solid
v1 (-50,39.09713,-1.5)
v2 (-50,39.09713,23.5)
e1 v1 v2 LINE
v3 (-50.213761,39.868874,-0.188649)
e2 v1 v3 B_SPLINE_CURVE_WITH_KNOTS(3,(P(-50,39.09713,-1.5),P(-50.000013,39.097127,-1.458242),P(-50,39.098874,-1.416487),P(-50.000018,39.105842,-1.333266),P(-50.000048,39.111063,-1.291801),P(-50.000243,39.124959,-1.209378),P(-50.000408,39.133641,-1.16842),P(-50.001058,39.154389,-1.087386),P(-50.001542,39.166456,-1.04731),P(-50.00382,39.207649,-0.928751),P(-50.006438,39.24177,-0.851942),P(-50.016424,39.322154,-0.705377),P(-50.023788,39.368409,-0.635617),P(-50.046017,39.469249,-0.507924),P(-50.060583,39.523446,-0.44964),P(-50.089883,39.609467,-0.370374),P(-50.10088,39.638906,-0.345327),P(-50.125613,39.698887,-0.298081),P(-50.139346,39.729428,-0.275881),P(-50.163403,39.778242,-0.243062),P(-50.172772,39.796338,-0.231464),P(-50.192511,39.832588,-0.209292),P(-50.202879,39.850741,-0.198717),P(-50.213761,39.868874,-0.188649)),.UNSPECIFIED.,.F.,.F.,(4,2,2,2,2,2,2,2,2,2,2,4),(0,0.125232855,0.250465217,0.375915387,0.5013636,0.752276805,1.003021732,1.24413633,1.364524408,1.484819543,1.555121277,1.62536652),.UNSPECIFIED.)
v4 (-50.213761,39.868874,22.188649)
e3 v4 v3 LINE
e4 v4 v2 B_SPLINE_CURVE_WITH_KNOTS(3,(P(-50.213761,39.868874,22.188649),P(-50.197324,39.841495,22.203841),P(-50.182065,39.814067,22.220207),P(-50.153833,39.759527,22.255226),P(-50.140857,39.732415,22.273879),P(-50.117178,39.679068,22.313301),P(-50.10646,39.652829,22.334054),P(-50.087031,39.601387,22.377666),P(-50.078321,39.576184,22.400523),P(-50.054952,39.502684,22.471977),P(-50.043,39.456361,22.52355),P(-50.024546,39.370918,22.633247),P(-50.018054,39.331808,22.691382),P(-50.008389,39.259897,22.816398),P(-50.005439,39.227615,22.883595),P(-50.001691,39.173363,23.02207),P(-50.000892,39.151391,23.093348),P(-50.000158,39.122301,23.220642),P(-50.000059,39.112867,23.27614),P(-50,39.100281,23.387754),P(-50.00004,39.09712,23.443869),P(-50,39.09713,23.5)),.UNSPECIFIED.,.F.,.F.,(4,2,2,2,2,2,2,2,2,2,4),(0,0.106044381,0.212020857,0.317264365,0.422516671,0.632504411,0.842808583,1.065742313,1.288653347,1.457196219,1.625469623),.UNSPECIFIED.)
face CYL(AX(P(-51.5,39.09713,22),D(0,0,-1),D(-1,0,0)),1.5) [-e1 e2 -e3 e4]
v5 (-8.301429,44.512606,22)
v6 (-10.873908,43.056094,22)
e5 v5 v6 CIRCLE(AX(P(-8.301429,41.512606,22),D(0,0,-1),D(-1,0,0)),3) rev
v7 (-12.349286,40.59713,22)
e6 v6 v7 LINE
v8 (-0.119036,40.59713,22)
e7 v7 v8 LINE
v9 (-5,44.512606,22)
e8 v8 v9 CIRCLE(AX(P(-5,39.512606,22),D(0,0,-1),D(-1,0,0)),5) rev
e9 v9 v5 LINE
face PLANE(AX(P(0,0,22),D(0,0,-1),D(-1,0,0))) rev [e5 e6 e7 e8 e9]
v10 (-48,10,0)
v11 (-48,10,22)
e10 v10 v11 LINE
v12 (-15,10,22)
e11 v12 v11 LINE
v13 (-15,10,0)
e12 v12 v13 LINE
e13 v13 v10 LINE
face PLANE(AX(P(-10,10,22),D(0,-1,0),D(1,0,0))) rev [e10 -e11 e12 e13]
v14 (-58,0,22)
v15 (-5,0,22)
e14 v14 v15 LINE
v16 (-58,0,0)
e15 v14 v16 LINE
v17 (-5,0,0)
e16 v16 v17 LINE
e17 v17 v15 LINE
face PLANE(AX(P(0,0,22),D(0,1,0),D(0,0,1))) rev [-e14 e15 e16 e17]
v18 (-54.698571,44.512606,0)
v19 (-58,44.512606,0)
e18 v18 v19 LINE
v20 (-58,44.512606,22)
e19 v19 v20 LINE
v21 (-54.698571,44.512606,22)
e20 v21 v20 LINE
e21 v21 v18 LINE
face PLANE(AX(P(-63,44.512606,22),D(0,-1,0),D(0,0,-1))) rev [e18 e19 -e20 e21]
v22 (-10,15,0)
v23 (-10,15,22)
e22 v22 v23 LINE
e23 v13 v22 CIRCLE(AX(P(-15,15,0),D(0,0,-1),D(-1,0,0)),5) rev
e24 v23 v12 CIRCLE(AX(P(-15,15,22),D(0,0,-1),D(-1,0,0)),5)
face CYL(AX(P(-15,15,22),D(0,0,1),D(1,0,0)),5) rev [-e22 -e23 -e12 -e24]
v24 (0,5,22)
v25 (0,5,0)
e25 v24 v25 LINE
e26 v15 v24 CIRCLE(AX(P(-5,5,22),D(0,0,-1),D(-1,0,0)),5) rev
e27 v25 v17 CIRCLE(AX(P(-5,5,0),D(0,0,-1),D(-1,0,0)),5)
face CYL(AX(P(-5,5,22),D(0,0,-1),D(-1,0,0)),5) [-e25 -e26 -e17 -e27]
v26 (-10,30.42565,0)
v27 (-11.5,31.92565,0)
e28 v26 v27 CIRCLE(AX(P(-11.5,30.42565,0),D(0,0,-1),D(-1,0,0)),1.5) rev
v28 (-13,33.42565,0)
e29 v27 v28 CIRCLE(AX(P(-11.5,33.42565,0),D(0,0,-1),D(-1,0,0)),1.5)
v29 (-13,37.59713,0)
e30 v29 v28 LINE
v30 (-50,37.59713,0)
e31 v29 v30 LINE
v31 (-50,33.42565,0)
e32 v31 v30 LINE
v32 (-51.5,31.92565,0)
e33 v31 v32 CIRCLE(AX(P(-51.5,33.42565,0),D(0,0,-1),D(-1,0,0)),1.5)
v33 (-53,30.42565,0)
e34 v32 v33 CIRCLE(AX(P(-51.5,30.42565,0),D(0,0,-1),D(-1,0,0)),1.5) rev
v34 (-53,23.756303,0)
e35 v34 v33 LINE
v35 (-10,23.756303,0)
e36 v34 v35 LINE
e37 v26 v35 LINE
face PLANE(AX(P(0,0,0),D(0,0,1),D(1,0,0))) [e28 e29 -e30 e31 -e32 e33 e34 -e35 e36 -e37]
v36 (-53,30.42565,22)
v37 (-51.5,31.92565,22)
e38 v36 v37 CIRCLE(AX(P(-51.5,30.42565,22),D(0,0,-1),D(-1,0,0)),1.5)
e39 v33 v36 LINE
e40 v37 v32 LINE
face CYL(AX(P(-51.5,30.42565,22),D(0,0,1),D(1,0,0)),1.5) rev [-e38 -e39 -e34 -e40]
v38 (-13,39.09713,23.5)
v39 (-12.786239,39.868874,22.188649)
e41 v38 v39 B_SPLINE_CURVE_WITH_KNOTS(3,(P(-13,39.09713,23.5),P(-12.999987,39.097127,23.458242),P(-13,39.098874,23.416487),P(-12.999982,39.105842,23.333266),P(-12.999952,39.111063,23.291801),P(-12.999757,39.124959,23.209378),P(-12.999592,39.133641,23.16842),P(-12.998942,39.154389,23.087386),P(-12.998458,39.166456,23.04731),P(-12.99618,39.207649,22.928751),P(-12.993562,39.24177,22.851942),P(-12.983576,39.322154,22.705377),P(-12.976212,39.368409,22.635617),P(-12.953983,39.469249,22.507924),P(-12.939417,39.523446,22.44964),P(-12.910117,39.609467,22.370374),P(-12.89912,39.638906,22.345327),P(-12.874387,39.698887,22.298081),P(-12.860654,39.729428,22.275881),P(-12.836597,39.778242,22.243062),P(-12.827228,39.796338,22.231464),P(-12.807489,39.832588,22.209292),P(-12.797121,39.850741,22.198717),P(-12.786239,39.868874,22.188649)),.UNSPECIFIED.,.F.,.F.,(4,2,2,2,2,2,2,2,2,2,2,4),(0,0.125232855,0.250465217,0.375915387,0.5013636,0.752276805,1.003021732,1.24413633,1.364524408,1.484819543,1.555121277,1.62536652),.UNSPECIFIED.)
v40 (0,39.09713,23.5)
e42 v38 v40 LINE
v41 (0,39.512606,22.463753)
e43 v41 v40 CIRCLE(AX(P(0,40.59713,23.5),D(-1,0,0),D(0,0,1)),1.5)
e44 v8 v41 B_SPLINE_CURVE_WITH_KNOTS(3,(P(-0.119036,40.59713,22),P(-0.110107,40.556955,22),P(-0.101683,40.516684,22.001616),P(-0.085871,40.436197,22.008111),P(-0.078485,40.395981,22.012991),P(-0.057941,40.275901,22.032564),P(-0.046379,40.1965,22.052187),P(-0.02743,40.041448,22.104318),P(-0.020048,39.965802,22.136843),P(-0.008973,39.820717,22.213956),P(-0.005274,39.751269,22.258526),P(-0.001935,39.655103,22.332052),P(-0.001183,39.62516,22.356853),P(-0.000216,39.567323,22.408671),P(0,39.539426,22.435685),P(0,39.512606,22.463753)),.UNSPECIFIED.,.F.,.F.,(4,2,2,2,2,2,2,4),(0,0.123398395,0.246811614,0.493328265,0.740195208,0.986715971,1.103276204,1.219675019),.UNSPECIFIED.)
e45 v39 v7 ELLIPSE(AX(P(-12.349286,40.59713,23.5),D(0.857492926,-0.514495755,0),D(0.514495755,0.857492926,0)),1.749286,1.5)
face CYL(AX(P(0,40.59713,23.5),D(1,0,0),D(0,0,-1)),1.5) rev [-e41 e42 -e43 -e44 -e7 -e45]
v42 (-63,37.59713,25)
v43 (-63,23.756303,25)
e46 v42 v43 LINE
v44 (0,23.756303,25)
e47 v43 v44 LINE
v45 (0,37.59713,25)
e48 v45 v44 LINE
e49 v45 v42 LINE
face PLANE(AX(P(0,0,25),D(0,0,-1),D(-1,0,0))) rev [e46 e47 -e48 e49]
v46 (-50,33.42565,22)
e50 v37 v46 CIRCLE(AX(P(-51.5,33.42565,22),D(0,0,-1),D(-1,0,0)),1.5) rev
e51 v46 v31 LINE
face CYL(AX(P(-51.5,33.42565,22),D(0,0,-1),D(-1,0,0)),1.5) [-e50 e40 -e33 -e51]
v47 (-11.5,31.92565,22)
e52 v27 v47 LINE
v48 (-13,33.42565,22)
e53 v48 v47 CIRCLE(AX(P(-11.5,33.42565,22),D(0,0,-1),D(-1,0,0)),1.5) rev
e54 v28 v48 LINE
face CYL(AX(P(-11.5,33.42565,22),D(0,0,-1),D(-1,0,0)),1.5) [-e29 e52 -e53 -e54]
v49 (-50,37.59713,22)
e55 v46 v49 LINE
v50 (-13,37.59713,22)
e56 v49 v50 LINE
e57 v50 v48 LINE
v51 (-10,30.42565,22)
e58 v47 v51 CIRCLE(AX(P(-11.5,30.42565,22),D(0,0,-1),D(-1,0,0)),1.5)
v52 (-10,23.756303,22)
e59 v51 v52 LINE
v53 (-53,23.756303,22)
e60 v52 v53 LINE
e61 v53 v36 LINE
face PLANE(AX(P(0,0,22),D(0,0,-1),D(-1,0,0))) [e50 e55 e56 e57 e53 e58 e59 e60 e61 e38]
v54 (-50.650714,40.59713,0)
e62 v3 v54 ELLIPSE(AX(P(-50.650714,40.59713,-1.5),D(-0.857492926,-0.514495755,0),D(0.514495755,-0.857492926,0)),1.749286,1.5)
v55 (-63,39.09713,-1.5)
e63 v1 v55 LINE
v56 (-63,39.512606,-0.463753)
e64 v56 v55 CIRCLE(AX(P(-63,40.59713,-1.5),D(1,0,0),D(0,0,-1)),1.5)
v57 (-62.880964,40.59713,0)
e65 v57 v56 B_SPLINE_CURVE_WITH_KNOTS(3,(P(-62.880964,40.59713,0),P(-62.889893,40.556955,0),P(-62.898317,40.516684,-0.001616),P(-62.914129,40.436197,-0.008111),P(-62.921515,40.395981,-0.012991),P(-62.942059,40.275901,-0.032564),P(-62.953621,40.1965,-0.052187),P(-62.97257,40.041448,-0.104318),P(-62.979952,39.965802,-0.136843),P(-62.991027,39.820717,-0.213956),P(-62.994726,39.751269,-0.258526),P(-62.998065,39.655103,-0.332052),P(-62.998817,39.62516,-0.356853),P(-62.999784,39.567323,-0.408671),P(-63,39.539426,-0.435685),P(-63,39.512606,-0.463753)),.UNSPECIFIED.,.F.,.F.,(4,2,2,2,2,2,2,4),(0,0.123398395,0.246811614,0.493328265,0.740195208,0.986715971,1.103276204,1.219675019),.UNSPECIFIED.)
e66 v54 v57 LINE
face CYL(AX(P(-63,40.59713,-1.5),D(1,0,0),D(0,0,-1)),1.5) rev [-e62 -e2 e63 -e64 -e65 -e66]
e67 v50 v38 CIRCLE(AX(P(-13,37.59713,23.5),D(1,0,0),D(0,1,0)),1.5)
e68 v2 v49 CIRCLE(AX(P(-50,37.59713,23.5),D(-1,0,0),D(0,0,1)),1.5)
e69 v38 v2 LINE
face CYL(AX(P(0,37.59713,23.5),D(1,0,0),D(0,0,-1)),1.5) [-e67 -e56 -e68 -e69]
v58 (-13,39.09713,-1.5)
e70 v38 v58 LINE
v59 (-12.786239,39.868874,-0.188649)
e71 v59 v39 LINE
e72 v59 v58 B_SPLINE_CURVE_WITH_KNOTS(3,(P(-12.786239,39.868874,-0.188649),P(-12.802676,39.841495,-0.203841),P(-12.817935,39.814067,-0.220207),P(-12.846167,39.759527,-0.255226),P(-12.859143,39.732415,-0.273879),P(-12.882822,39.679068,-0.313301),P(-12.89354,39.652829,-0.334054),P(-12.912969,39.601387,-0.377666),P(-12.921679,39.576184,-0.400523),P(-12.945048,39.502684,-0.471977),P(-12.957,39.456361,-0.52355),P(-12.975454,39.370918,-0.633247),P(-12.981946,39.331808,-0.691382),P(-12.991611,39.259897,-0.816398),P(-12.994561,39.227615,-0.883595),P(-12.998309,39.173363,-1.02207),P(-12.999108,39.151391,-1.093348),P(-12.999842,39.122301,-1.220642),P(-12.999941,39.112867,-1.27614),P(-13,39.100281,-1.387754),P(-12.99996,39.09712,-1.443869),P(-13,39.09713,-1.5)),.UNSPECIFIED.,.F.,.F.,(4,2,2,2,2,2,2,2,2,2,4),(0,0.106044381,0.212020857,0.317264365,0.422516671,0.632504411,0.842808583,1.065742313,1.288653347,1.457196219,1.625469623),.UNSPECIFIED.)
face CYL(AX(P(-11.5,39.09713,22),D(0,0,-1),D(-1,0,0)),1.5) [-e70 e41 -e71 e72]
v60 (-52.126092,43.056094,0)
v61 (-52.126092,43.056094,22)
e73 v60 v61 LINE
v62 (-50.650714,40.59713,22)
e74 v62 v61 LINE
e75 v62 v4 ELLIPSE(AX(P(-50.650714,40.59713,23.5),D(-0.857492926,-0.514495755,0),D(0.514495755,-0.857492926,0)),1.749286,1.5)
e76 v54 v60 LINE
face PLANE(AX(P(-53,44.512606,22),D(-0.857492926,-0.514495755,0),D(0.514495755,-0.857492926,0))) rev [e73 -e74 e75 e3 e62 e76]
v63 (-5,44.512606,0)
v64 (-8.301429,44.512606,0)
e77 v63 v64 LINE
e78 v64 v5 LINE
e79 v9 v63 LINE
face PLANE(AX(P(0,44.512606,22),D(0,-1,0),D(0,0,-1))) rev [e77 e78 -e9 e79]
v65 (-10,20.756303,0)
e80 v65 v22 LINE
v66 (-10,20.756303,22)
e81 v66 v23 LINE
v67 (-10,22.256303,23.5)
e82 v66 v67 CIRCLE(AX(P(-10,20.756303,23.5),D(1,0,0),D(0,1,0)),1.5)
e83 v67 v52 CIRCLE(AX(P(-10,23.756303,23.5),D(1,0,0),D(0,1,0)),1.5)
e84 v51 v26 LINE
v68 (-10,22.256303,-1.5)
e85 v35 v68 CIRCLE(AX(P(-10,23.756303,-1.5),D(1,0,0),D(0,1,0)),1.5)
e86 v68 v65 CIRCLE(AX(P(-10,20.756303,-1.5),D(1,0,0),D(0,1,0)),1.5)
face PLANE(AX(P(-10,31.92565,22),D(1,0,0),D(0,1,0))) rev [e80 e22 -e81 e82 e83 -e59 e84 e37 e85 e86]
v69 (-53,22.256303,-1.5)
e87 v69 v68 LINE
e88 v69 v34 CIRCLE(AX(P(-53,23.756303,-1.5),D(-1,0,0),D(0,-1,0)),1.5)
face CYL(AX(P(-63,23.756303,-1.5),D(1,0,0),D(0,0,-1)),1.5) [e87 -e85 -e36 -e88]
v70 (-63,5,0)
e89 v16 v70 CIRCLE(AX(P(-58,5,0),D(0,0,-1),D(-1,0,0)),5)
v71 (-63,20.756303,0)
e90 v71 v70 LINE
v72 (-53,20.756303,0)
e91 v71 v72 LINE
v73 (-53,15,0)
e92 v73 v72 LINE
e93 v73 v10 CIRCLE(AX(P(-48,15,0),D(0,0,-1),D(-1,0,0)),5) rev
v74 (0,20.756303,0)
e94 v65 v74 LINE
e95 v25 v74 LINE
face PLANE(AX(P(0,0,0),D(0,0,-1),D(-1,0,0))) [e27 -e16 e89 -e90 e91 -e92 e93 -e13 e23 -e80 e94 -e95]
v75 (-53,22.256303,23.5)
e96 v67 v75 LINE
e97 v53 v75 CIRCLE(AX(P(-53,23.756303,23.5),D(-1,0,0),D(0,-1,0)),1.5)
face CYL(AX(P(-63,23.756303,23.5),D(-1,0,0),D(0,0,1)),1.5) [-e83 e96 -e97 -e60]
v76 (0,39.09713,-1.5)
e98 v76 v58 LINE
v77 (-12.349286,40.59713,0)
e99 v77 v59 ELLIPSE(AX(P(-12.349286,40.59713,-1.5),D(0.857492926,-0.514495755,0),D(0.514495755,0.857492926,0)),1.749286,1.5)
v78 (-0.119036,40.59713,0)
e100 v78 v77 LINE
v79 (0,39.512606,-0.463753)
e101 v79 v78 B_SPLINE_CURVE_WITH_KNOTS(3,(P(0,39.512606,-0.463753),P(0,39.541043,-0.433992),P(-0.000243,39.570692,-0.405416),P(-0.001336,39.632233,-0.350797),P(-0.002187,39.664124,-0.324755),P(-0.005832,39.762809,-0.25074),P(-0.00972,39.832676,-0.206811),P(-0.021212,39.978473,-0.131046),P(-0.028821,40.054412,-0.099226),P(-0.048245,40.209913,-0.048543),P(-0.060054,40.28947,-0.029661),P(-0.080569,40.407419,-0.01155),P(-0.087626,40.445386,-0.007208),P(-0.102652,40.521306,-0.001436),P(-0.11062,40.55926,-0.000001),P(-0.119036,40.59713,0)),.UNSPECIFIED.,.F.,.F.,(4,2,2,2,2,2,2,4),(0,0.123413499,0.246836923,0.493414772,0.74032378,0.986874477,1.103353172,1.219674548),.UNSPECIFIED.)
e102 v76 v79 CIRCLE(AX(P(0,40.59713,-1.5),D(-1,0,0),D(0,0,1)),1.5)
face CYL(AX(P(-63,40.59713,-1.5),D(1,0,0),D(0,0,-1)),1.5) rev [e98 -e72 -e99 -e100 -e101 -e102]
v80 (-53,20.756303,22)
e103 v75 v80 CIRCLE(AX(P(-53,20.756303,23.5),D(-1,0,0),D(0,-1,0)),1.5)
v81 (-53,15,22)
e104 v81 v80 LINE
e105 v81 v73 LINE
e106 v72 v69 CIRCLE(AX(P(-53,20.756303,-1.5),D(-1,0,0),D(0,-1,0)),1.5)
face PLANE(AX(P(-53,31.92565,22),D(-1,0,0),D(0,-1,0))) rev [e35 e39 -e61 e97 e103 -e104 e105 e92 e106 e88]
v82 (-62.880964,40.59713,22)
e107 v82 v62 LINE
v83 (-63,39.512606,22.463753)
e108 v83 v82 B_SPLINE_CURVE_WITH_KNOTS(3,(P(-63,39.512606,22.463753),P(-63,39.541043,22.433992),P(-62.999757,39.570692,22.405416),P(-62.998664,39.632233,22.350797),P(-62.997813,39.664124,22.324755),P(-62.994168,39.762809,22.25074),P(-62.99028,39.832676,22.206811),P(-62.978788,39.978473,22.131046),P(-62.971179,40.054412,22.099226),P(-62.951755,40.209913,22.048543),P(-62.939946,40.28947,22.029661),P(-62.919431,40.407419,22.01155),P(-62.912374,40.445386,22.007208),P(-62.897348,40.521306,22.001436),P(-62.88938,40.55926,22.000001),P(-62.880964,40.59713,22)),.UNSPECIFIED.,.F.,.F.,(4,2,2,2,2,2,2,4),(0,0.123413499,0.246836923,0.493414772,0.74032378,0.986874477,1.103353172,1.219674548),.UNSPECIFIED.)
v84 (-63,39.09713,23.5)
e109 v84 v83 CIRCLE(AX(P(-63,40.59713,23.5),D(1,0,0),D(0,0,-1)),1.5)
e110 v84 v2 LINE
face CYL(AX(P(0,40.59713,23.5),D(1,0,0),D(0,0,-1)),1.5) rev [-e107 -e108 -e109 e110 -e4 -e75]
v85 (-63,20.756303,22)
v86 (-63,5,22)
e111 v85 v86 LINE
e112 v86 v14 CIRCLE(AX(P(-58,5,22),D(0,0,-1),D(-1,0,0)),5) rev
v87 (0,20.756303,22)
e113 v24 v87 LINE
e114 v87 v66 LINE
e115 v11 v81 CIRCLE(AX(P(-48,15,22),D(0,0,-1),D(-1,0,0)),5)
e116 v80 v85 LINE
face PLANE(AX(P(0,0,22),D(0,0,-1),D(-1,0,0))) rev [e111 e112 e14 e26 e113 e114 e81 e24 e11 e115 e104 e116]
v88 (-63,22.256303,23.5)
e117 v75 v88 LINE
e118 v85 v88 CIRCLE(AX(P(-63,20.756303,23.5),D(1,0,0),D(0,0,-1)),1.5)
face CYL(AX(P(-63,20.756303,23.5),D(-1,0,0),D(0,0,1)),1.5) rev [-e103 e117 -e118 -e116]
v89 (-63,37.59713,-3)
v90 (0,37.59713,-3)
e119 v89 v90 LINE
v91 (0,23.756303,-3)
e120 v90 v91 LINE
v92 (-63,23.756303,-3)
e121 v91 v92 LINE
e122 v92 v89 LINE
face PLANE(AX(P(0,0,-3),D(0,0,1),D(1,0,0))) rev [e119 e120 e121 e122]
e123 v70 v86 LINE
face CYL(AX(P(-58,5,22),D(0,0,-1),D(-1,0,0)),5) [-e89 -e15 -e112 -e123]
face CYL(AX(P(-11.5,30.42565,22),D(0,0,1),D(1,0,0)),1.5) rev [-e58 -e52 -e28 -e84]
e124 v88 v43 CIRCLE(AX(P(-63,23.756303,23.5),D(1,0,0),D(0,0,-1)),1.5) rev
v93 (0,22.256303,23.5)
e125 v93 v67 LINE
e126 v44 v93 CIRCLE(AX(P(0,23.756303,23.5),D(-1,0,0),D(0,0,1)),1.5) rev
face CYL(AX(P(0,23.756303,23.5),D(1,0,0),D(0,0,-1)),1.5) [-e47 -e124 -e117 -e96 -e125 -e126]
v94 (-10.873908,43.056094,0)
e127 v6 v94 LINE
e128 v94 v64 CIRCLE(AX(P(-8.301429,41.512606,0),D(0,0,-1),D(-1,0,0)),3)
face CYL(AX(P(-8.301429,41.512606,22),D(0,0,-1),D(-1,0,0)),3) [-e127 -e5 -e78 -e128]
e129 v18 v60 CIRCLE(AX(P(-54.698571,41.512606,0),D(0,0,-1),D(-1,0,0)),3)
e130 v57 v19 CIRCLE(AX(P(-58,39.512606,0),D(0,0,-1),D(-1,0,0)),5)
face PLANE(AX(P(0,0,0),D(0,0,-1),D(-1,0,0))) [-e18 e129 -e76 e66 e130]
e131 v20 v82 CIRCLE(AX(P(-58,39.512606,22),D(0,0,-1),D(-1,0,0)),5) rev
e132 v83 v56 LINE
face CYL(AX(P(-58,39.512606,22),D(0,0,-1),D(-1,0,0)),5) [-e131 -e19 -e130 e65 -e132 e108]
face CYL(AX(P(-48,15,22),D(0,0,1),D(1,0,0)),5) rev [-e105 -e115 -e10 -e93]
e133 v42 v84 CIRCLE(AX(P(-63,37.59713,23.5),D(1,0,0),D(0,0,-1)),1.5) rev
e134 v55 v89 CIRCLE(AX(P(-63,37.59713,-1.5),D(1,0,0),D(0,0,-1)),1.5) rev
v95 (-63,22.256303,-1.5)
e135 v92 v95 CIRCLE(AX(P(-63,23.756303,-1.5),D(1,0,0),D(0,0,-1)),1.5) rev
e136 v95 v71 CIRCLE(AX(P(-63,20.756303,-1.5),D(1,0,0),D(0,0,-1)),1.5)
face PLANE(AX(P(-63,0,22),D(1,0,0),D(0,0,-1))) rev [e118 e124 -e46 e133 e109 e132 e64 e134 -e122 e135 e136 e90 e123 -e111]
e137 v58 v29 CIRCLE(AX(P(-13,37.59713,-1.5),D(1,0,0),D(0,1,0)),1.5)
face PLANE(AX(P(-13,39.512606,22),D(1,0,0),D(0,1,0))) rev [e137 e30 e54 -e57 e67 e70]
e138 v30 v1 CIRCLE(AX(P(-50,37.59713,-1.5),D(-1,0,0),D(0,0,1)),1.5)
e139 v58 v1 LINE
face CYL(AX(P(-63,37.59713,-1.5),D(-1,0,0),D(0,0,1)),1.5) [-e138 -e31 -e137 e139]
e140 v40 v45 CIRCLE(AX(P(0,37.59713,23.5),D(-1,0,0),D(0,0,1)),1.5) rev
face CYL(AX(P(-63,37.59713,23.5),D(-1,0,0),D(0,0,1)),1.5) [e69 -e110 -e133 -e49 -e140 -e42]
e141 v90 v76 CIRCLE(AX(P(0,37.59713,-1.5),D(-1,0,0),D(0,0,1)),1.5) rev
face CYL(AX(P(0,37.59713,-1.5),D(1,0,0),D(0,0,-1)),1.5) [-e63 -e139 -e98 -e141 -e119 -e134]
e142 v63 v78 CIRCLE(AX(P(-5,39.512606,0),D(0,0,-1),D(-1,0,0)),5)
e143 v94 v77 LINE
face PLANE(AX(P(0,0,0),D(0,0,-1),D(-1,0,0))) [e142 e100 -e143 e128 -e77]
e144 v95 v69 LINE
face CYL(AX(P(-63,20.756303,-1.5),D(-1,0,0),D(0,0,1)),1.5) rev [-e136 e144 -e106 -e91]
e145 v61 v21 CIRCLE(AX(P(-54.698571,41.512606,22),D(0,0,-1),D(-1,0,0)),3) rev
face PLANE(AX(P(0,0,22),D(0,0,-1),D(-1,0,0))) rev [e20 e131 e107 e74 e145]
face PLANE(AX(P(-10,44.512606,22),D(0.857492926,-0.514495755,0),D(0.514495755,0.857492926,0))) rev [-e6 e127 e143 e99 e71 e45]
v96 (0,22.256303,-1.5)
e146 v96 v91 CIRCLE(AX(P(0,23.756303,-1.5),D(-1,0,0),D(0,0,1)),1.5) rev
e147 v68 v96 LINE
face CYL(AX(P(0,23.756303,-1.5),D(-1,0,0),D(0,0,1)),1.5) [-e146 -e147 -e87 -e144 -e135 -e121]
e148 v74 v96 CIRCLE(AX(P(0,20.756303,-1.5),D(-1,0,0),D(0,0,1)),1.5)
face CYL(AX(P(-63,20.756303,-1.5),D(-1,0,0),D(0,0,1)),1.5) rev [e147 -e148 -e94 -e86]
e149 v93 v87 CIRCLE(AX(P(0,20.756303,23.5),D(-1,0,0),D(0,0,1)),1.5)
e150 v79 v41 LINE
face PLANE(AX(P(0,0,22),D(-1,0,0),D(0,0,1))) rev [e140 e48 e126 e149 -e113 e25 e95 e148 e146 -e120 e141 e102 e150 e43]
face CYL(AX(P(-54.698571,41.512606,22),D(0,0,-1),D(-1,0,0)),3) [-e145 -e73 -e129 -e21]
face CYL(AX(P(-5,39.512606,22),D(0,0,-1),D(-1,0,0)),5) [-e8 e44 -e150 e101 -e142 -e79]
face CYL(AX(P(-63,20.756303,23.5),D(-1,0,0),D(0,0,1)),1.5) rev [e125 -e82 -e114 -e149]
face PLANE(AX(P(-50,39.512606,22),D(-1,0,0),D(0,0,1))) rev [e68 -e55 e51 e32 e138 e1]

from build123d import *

# Parameters (mm, degrees)
BOSS_EXTRUDE1_DEPTH = 22
FILLET2_R           = 5
FILLET4_R           = 5
FILLET5_R           = 1.5
FILLET6_R           = 3
FILLET7_R           = 1.5
SKETCH5_W           = 63
SKETCH5_H           = 16.840827273
BOSS_EXTRUDE2_DEPTH = 3
SKETCH6_W           = 63
SKETCH6_H           = 16.840827273
BOSS_EXTRUDE3_DEPTH = 3
FILLET8_R           = 1.5
FILLET9_R           = 1.5


with BuildPart() as part:
    # Sketch1 → Boss-Extrude1 (new body)
    with BuildSketch(Plane(origin=(0, 0, 0), x_dir=(0, 1, 0), z_dir=(0, 0, 1))):
        Polygon((0, 0), (44.512606441, 0), (44.512606441, 10), (39.512606441, 13), (31.925649919, 13), (31.925649919, 10), (10, 10), (10, 53), (31.925649919, 53), (31.925649919, 50), (39.512606441, 50), (44.512606441, 53), (44.512606441, 63), (0, 63), align=None)
    extrude(amount=BOSS_EXTRUDE1_DEPTH)

    # Fillet2
    fillet2_edges = [part.edges().sort_by_distance(p)[0] for p in [
        (-63, 0, 11),
        (-63, 44.512606441, 11),
        (0, 44.512606441, 11),
        (0, 0, 11),
    ]]
    fillet(fillet2_edges, radius=FILLET2_R)

    # Fillet4
    fillet4_edges = [part.edges().sort_by_distance(p)[0] for p in [
        (-53, 10, 11),
        (-10, 10, 11),
    ]]
    fillet(fillet4_edges, radius=FILLET4_R)

    # Fillet5
    fillet5_edges = [part.edges().sort_by_distance(p)[0] for p in [
        (-53, 31.925649919, 11),
        (-10, 31.925649919, 11),
    ]]
    fillet(fillet5_edges, radius=FILLET5_R)

    # Fillet6
    fillet6_edges = [part.edges().sort_by_distance(p)[0] for p in [
        (-53, 44.512606441, 11),
        (-10, 44.512606441, 11),
    ]]
    fillet(fillet6_edges, radius=FILLET6_R)

    # Fillet7
    fillet7_edges = [part.edges().sort_by_distance(p)[0] for p in [
        (-13, 39.512606441, 11),
        (-50, 39.512606441, 11),
        (-50, 31.925649919, 11),
        (-13, 31.925649919, 11),
    ]]
    fillet(fillet7_edges, radius=FILLET7_R - 0.0001)  # a hair under: the kernel refuses the full size

    # Sketch5 → Boss-Extrude2 (add)
    with BuildSketch(Plane.XY.offset(22)):
        with Locations((-31.5, 30.676716857)):
            Rectangle(SKETCH5_W, SKETCH5_H)
    extrude(amount=BOSS_EXTRUDE2_DEPTH)

    # Sketch6 → Boss-Extrude3 (add)
    with BuildSketch(Plane(origin=(0, 0, 0), x_dir=(1, 0, 0), z_dir=(0, 0, -1))):
        with Locations((-31.5, -30.676716857)):
            Rectangle(SKETCH6_W, SKETCH6_H)
    extrude(amount=BOSS_EXTRUDE3_DEPTH)

    # Fillet8
    fillet8_edges = [part.edges().sort_by_distance(p)[0] for p in [
        (-31.5, 22.25630322, 22),
        (-31.5, 39.097130493, 25),
        (-31.5, 22.25630322, 25),
        (-31.5, 39.097130493, 22),
        (-31.5, 39.097130493, 0),
        (-31.5, 22.25630322, 0),
        (-31.5, 39.097130493, -3),
        (-31.5, 22.25630322, -3),
    ]]
    fillet(fillet8_edges, radius=FILLET8_R - 0.0001)  # a hair under: the kernel refuses the full size

    # Fillet9
    fillet9_edges = [part.edges().sort_by_distance(p)[0] for p in [
        (-5, 22.25630322, 22),
    ]]
    fillet(fillet9_edges, radius=FILLET9_R - 0.0001)  # a hair under: the kernel refuses the full size
    fillet9_2_edges = [part.edges().sort_by_distance(p)[0] for p in [
        (-58, 22.25630322, 22),
    ]]
    fillet(fillet9_2_edges, radius=FILLET9_R - 0.0001)  # a hair under: the kernel refuses the full size
    fillet9_3_edges = [part.edges().sort_by_distance(p)[0] for p in [
        (-58, 22.25630322, 0),
    ]]
    fillet(fillet9_3_edges, radius=FILLET9_R - 0.0001)  # a hair under: the kernel refuses the full size
    fillet9_4_edges = [part.edges().sort_by_distance(p)[0] for p in [
        (-5, 22.25630322, 0),
    ]]
    fillet(fillet9_4_edges, radius=FILLET9_R - 0.0001)  # a hair under: the kernel refuses the full size
    fillet9_5_edges = [part.edges().sort_by_distance(p)[0] for p in [
        (-56.5, 39.097130493, 22),
    ]]
    fillet(fillet9_5_edges, radius=FILLET9_R - 0.0001)  # a hair under: the kernel refuses the full size
    fillet9_6_edges = [part.edges().sort_by_distance(p)[0] for p in [
        (-6.5, 39.097130493, 22),
    ]]
    fillet(fillet9_6_edges, radius=FILLET9_R - 0.0001)  # a hair under: the kernel refuses the full size
    fillet9_7_edges = [part.edges().sort_by_distance(p)[0] for p in [
        (-6.5, 39.097130493, 0),
    ]]
    fillet(fillet9_7_edges, radius=FILLET9_R - 0.0001)  # a hair under: the kernel refuses the full size
    fillet9_8_edges = [part.edges().sort_by_distance(p)[0] for p in [
        (-56.5, 39.097130493, 0),
    ]]
    fillet(fillet9_8_edges, radius=FILLET9_R - 0.0001)  # a hair under: the kernel refuses the full size


solid = part.part
